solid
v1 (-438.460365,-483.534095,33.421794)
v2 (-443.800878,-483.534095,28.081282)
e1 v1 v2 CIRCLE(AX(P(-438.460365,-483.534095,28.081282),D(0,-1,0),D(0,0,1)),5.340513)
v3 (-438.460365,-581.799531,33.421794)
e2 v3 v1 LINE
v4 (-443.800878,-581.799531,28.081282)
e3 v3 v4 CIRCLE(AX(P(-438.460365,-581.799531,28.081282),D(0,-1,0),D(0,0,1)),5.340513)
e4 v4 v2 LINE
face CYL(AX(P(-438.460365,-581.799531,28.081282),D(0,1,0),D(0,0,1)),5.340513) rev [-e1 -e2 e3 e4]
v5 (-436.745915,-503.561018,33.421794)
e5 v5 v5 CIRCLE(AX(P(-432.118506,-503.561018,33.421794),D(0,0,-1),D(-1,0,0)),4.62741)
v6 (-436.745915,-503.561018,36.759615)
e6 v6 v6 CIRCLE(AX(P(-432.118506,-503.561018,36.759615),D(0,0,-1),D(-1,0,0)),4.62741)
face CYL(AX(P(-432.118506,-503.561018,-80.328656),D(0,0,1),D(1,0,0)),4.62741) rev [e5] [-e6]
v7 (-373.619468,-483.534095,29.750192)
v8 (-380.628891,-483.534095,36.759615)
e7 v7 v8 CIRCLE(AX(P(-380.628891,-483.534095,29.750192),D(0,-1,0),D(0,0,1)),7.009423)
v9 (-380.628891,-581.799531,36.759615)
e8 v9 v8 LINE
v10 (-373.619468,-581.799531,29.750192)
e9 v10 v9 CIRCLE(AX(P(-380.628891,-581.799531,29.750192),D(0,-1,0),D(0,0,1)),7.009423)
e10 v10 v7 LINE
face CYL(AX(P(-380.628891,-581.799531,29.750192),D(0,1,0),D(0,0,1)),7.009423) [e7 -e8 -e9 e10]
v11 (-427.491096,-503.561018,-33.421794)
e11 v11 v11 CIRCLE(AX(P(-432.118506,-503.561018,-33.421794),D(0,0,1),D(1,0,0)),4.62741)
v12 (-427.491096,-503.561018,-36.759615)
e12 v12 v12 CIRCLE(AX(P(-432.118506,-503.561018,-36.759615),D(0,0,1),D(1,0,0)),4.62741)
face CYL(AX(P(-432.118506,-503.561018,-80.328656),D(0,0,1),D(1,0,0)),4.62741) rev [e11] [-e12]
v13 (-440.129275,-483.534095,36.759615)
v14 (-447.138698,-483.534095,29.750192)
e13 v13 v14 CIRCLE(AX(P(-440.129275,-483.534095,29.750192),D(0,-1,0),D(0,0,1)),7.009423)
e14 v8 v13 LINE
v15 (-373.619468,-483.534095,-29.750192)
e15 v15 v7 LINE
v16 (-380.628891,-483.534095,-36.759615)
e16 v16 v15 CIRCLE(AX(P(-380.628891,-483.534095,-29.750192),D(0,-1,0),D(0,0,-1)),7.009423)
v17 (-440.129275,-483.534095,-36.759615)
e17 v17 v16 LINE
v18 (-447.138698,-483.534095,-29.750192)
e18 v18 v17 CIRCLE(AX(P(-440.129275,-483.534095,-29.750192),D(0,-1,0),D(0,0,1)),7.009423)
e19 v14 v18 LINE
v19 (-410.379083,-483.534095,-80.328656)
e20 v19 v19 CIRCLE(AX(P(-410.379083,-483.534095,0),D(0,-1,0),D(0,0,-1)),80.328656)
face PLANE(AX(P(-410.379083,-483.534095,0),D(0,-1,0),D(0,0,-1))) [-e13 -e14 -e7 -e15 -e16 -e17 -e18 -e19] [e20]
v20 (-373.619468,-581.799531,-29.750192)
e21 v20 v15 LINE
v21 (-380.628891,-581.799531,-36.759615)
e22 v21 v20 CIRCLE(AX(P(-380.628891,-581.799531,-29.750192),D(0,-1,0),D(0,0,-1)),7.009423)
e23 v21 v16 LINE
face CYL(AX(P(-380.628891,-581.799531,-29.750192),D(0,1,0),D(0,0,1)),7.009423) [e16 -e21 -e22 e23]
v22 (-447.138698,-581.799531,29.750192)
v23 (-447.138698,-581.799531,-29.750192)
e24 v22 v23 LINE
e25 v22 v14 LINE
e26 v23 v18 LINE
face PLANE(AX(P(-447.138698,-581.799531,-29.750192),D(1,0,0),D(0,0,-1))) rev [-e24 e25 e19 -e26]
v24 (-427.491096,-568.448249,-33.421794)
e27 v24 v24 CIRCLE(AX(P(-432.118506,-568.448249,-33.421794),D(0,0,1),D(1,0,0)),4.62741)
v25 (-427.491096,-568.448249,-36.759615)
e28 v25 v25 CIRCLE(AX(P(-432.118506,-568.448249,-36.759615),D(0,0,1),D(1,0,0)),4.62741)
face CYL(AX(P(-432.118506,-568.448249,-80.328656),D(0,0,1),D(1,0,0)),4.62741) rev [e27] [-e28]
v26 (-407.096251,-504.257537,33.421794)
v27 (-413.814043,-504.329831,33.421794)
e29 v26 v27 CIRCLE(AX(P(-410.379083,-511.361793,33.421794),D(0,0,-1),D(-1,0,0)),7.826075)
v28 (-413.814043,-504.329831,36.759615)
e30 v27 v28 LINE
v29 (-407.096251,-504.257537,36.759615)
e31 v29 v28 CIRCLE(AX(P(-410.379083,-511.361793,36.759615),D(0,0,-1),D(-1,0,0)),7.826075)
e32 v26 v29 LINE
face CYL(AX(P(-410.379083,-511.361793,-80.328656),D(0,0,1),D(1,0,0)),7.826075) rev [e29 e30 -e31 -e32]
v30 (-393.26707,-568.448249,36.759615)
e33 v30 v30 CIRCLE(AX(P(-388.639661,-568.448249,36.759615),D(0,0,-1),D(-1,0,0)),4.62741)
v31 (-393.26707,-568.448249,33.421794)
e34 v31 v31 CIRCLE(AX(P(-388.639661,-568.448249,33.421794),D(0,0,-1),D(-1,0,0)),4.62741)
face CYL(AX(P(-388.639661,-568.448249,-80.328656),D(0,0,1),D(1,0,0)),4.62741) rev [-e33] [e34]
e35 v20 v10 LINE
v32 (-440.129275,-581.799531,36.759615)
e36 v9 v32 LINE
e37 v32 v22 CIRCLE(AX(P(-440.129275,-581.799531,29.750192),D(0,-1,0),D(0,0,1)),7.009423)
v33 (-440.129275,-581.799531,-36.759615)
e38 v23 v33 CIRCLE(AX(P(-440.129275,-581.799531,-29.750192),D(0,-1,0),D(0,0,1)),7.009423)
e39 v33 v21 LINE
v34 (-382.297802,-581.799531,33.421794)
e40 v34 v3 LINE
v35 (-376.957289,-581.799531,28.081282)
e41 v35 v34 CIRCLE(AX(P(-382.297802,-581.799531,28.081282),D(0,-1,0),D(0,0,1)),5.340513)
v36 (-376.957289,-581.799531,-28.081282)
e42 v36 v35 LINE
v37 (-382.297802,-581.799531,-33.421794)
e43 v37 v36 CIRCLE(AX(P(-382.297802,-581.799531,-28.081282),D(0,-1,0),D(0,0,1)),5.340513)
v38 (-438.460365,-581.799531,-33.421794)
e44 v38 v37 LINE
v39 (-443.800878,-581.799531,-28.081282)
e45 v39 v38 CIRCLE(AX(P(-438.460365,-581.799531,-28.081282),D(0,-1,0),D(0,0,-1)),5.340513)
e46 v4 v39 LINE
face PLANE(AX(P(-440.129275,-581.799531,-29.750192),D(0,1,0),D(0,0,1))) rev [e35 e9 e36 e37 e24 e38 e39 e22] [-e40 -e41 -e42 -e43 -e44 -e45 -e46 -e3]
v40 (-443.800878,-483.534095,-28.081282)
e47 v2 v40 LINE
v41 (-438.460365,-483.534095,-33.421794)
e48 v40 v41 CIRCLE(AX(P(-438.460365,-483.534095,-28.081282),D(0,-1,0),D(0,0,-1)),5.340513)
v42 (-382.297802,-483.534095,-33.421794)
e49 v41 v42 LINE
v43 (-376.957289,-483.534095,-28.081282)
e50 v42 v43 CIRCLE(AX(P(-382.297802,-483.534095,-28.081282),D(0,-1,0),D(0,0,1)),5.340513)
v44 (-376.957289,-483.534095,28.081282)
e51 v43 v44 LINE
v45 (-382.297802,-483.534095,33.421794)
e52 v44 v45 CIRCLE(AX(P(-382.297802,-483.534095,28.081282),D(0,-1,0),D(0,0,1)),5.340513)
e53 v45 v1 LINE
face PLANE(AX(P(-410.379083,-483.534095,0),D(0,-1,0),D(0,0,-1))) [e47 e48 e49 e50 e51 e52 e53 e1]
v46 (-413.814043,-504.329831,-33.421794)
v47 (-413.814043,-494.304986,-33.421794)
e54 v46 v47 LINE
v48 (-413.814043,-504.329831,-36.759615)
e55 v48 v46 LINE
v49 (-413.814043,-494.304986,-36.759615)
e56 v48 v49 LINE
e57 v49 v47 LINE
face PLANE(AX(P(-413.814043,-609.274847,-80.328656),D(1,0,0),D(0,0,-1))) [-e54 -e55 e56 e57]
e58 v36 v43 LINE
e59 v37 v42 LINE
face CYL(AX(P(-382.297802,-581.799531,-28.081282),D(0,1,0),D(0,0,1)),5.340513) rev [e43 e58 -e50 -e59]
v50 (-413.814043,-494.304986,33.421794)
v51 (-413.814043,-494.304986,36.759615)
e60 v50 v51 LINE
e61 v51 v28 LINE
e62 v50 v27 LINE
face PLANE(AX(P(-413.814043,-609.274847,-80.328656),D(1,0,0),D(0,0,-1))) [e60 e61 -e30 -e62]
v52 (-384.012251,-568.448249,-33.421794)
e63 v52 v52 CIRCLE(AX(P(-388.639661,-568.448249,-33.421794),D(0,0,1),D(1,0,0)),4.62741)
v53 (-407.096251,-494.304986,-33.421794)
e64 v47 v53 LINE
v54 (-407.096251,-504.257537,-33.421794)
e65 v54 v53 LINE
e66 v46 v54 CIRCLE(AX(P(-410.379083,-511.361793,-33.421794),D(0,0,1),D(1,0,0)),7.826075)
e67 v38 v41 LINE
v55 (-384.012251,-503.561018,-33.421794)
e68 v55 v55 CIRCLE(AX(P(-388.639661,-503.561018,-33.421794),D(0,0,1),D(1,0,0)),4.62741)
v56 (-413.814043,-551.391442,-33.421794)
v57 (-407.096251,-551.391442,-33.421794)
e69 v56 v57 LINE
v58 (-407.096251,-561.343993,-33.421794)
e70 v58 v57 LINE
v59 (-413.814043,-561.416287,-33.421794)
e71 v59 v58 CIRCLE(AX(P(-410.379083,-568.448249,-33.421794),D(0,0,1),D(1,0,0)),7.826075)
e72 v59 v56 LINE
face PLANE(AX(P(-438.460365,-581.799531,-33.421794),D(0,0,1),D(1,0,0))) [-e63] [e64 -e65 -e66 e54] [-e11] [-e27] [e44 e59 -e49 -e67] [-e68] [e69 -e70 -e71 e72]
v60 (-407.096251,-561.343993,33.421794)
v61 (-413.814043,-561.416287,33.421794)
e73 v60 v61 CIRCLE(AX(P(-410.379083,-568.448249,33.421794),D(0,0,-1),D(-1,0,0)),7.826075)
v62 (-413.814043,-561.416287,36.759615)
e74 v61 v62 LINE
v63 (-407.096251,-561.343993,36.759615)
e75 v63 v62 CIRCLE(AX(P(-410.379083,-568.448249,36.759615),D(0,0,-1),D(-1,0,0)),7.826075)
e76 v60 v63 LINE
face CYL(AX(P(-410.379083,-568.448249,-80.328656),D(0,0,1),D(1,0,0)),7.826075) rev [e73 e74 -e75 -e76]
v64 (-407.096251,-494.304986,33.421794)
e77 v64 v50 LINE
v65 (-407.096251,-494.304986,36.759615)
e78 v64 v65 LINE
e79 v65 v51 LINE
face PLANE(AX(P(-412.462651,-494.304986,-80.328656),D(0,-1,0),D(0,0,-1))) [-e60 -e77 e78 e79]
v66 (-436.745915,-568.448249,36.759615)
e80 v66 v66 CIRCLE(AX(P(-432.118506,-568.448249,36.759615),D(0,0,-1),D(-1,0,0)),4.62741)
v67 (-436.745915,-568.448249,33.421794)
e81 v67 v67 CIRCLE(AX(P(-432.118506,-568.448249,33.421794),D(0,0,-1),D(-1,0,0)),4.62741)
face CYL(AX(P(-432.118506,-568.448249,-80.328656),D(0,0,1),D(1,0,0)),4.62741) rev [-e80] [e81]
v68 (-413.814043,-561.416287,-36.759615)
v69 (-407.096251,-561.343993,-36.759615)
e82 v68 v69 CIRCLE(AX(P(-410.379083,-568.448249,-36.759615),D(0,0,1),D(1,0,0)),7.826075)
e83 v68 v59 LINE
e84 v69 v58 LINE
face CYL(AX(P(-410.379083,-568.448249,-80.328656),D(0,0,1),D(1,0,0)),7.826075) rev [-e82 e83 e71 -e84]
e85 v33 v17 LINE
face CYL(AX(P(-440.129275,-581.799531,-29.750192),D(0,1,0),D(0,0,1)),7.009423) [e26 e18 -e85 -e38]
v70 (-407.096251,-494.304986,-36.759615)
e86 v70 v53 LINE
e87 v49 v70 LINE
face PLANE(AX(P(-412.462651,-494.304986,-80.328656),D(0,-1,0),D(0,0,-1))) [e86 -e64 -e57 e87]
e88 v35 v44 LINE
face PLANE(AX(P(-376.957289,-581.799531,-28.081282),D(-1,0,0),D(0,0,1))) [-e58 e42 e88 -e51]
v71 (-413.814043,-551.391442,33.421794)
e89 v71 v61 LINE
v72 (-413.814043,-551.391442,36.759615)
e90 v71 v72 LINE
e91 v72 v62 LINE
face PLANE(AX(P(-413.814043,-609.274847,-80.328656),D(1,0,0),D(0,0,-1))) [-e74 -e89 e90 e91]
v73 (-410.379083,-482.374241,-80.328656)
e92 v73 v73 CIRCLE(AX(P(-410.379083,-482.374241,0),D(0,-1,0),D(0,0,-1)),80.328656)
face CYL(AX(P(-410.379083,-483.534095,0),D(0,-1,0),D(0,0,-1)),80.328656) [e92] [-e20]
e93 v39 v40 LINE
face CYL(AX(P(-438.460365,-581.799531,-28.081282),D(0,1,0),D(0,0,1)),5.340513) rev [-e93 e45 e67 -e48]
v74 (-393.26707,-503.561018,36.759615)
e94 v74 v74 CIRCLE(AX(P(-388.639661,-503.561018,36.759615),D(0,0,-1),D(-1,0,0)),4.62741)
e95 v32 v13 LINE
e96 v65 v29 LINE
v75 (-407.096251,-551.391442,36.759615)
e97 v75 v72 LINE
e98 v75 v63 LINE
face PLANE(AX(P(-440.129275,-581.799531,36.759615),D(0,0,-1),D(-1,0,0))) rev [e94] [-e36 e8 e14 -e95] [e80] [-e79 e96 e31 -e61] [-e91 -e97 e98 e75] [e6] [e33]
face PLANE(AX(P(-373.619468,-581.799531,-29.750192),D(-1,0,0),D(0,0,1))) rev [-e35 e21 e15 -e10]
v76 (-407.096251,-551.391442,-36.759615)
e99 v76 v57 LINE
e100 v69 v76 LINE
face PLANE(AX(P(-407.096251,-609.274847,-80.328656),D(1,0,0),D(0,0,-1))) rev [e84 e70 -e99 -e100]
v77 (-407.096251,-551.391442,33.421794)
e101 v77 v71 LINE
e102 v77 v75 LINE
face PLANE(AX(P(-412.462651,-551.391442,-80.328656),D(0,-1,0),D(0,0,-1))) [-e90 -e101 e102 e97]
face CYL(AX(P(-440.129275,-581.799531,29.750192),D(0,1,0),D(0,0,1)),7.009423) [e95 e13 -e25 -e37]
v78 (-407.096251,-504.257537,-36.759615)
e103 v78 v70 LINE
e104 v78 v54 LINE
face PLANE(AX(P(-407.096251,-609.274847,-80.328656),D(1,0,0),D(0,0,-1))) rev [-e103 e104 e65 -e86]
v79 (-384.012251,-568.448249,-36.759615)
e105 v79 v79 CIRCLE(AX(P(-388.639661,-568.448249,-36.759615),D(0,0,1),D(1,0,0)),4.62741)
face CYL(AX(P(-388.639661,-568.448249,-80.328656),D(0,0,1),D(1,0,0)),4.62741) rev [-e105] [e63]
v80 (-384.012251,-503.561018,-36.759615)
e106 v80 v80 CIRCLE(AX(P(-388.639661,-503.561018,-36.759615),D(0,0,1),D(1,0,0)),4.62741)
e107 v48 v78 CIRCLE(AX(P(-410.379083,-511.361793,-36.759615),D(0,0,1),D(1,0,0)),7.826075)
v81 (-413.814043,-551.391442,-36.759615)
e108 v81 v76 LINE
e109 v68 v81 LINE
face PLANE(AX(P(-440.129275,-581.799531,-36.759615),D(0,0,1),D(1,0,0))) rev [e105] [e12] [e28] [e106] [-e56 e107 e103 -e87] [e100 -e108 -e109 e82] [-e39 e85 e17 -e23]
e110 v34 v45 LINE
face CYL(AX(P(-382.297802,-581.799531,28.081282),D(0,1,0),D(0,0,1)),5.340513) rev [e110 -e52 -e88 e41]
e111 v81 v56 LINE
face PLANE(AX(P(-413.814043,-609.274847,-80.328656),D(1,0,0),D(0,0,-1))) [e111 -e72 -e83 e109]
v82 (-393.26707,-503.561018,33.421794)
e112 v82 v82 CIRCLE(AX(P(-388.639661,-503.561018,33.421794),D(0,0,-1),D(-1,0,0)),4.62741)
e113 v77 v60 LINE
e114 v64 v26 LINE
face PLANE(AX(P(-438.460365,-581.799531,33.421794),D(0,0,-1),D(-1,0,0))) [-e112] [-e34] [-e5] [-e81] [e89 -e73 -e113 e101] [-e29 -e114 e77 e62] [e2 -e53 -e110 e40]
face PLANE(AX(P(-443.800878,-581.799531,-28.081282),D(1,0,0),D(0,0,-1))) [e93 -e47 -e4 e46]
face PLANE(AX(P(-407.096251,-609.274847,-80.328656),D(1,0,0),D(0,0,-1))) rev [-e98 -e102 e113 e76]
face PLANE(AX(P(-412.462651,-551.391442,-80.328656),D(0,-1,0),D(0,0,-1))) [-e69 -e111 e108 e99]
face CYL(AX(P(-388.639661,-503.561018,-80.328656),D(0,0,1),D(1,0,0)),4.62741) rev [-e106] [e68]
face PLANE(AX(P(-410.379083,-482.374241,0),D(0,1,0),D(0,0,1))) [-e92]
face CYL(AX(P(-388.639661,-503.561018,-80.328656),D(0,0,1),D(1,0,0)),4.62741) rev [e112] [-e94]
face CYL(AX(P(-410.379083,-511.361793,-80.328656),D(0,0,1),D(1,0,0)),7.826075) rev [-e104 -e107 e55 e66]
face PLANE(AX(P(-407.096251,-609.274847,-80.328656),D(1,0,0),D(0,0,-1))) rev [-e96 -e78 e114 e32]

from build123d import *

# Parameters (mm, degrees)
SKETCH3_W               = 38.2050925
SKETCH3_H               = 0.551638054
BOSS_EXTRUDE1_DEPTH     = 46.736
CUT_EXTRUDE1_DEPTH      = 365.000734219
CUT_EXTRUDE1_DEPTH_BACK = 365.000734219
SKETCH5_R               = 2.200841193
SCALE1_SCALE            = 2.1025641


with BuildPart() as part:
    # Sketch3 → Revolve1 (revolve)
    with BuildSketch(Plane.XY):
        with Locations((-176.077749649, -229.697714421)):
            Rectangle(SKETCH3_W, SKETCH3_H)
    revolve(axis=Axis((-195.180295899, -229.973533448, 0), (0, 1, 0)))

    # Sketch4 → Boss-Extrude1 (add)
    with BuildSketch(Plane.XZ.offset(229.973533448)):
        with BuildLine():
            Line((-209.32977738, -17.483231481), (-181.030814417, -17.483231481))
            ThreePointArc((-181.030814417, -17.483231481), (-178.673497186, -16.506798713), (-177.697064417, -14.149481481))
            Line((-177.697064417, -14.149481481), (-177.697064417, 14.149481481))
            ThreePointArc((-177.697064417, 14.149481481), (-178.673497186, 16.506798713), (-181.030814417, 17.483231481))
            Line((-181.030814417, 17.483231481), (-209.32977738, 17.483231481))
            ThreePointArc((-209.32977738, 17.483231481), (-211.687094612, 16.506798713), (-212.66352738, 14.149481481))
            Line((-212.66352738, 14.149481481), (-212.66352738, -14.149481481))
            ThreePointArc((-212.66352738, -14.149481481), (-211.687094612, -16.506798713), (-209.32977738, -17.483231481))
        make_face()
        with BuildLine():
            Line((-211.07602738, -13.355731481), (-211.07602738, 13.355731481))
            ThreePointArc((-211.07602738, 13.355731481), (-210.332078604, 15.151782705), (-208.53602738, 15.895731481))
            Line((-208.53602738, 15.895731481), (-181.824564417, 15.895731481))
            ThreePointArc((-181.824564417, 15.895731481), (-180.028513193, 15.151782705), (-179.284564417, 13.355731481))
            Line((-179.284564417, 13.355731481), (-179.284564417, -13.355731481))
            ThreePointArc((-179.284564417, -13.355731481), (-180.028513193, -15.151782705), (-181.824564417, -15.895731481))
            Line((-181.824564417, -15.895731481), (-208.53602738, -15.895731481))
            ThreePointArc((-208.53602738, -15.895731481), (-210.332078604, -15.151782705), (-211.07602738, -13.355731481))
        make_face(mode=Mode.SUBTRACT)
    extrude(amount=BOSS_EXTRUDE1_DEPTH)

    # Sketch5 → Cut-Extrude1 (cut, two sides: drawn at the far end of the back side and taken through both)
    with BuildSketch(Plane.XY.offset(-CUT_EXTRUDE1_DEPTH_BACK)):
        with BuildLine():
            Line((-196.813996528, -262.2471497), (-196.813996528, -267.015063616))
            ThreePointArc((-196.813996528, -267.015063616), (-195.140241919, -274.081475398), (-193.618948859, -266.980679852))
            Line((-193.618948859, -266.980679852), (-193.618948859, -262.2471497))
            Line((-193.618948859, -262.2471497), (-196.813996528, -262.2471497))
        make_face()
        with BuildLine():
            Line((-196.813996528, -235.096274088), (-196.813996528, -239.864188004))
            ThreePointArc((-196.813996528, -239.864188004), (-195.140241919, -246.930599786), (-193.618948859, -239.82980424))
            Line((-193.618948859, -239.82980424), (-193.618948859, -235.096274088))
            Line((-193.618948859, -235.096274088), (-196.813996528, -235.096274088))
        make_face()
        with Locations((-205.51977738, -270.359533448)):
            Circle(SKETCH5_R)
        with Locations((-205.51977738, -239.498533448)):
            Circle(SKETCH5_R)
        with Locations((-184.840814417, -239.498533448)):
            Circle(SKETCH5_R)
        with Locations((-184.840814417, -270.359533448)):
            Circle(SKETCH5_R)
    extrude(amount=CUT_EXTRUDE1_DEPTH + CUT_EXTRUDE1_DEPTH_BACK, mode=Mode.SUBTRACT)


with BuildPart() as part_1:
    # Scale1: scaled about (0, 0, 0)
    add(part.part.scale(SCALE1_SCALE))


solid = part_1.part
